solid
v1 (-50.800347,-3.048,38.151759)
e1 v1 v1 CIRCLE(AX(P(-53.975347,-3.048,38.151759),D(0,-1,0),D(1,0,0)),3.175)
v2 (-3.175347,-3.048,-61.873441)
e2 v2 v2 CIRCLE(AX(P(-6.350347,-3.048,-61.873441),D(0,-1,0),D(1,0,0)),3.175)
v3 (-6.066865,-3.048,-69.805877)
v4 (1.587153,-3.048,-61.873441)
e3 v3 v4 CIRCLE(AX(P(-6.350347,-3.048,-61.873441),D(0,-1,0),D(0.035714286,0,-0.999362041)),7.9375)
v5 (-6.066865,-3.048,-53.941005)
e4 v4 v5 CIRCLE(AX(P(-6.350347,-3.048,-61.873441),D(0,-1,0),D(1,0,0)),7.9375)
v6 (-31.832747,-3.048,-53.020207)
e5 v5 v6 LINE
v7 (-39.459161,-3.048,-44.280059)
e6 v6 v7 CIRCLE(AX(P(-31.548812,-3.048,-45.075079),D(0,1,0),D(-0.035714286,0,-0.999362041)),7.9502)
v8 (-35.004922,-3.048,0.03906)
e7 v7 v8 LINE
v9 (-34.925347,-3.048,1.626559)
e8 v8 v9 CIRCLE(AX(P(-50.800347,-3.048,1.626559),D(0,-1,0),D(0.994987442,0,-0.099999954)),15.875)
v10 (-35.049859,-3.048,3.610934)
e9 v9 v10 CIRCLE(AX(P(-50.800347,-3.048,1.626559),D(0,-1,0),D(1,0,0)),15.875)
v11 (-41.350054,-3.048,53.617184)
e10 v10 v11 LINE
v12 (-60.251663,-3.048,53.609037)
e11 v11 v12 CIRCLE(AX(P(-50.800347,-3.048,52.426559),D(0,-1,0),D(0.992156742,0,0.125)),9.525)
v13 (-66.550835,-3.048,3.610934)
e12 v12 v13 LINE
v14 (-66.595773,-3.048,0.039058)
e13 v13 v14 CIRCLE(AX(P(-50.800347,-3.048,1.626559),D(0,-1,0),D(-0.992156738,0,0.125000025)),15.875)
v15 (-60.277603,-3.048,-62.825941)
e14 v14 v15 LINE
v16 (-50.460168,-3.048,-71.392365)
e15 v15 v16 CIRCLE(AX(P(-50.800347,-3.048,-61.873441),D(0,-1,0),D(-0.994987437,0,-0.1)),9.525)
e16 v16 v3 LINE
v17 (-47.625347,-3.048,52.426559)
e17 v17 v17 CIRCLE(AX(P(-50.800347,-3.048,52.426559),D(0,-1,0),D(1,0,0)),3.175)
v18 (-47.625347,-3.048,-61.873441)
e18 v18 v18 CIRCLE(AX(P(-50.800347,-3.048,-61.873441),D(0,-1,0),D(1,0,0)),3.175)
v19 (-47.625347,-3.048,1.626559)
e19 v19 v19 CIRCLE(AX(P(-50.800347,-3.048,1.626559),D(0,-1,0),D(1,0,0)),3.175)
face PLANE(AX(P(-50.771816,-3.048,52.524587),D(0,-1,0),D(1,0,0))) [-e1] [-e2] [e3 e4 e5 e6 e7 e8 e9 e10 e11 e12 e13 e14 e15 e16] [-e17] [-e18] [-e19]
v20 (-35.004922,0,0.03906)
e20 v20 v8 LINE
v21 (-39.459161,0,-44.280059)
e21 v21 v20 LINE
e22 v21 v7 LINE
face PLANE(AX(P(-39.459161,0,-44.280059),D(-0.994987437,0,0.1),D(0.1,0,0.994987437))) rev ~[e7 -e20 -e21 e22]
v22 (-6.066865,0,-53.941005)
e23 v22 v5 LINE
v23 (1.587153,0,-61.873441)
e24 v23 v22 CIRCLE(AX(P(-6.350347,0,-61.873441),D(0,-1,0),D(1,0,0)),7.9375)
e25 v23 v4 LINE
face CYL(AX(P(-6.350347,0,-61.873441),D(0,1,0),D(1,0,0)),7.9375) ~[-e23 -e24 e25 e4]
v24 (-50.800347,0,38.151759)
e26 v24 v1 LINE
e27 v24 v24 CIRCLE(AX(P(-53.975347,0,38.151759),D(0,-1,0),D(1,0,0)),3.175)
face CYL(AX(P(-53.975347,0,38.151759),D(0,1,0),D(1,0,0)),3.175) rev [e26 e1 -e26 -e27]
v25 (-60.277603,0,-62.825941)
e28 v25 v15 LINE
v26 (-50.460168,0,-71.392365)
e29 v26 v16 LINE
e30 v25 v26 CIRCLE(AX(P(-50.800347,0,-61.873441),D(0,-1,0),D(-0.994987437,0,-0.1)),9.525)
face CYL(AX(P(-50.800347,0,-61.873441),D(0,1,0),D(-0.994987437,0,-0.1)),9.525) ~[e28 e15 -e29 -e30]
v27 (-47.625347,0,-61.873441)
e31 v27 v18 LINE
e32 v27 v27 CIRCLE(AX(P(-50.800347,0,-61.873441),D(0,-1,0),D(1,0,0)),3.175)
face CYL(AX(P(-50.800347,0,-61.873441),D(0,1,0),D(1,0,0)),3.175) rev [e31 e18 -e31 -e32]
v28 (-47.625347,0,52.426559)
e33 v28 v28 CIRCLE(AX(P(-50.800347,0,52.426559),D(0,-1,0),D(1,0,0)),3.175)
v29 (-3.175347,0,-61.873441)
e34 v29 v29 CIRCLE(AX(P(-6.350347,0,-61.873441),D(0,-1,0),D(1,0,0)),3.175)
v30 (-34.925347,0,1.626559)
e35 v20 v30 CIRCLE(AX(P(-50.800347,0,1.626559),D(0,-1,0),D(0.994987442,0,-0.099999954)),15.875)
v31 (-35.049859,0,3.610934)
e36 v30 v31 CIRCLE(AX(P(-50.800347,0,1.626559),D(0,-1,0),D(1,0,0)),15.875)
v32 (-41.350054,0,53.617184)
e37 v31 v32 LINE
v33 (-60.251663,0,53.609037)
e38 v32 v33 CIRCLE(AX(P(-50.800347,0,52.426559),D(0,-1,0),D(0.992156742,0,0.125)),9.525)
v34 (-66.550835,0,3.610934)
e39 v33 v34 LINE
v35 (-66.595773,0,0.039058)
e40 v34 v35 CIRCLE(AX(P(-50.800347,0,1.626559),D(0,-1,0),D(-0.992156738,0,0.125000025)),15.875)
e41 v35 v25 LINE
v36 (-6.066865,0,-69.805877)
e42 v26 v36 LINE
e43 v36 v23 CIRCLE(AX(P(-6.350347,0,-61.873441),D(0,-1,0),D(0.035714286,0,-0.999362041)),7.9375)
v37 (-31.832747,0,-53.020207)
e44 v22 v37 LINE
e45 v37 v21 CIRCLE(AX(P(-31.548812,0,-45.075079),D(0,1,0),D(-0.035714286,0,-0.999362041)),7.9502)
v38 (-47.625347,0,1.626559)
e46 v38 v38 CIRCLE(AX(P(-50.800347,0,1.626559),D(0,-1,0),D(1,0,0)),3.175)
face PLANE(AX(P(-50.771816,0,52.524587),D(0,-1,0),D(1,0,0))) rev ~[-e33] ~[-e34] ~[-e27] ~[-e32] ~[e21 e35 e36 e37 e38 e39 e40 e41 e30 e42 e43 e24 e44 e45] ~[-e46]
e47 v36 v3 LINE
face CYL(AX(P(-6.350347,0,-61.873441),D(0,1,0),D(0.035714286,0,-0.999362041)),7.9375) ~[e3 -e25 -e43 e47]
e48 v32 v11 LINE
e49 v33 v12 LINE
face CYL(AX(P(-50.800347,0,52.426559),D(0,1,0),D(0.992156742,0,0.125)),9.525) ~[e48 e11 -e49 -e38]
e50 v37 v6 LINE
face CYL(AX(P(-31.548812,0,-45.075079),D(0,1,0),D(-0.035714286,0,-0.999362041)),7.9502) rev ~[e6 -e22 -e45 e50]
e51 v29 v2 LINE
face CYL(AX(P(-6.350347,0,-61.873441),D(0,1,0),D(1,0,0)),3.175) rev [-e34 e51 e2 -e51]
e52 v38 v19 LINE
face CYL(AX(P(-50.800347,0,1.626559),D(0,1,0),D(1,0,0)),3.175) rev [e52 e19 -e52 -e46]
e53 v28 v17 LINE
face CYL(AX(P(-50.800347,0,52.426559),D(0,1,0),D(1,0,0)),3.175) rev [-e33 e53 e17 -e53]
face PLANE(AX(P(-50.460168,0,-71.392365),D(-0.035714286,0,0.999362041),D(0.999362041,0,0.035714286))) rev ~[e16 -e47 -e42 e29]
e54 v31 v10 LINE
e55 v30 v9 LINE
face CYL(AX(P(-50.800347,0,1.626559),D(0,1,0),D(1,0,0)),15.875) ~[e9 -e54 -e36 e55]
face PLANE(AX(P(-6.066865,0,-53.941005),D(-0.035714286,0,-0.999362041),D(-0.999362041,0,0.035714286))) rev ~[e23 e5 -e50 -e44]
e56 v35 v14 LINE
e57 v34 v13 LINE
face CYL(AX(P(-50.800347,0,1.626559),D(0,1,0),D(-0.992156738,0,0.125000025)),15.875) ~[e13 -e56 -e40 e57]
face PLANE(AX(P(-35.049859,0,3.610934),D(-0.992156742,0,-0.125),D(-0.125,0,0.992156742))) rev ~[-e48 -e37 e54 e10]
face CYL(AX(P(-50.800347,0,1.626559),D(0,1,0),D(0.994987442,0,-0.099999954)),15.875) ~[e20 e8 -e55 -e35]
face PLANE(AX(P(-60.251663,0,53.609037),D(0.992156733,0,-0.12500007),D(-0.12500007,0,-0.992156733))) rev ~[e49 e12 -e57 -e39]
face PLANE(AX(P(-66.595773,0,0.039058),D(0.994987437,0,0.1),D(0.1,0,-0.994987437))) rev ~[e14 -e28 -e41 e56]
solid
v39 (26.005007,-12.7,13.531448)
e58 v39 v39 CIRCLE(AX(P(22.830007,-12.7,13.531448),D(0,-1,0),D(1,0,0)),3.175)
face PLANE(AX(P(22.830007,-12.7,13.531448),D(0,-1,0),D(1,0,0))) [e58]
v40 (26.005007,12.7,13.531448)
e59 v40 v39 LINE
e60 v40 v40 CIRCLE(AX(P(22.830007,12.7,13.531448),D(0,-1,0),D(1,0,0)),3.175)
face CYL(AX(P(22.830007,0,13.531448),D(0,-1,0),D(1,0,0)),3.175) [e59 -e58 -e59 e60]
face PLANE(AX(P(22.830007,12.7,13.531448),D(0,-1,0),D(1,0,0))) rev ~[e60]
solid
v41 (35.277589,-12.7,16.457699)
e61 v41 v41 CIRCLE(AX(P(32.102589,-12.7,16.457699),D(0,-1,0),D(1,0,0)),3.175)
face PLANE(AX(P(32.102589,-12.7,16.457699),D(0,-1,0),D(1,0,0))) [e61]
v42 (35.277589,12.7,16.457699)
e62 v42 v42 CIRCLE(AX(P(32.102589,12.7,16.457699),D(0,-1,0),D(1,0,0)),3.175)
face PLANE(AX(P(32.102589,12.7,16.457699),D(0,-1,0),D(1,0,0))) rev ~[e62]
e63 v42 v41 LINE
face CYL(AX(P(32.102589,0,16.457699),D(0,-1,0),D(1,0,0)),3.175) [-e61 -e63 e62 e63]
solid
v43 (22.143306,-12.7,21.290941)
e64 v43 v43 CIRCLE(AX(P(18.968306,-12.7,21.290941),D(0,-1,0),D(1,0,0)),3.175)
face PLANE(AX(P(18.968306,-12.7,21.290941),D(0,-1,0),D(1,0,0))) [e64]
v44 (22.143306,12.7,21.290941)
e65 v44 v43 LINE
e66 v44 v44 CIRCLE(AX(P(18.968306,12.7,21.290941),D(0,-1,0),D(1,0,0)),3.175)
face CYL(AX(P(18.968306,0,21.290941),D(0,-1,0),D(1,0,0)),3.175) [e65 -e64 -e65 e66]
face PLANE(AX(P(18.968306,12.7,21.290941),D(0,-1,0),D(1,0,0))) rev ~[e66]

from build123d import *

# Parameters (mm, degrees)
F0_R     = 3.175
F1_DEPTH = 3.048
F2_R     = 3.175
F3_DEPTH = 12.7
F5_R     = 3.175
F6_DEPTH = 12.7
F4_R     = 3.175
F7_DEPTH = 12.7


# Not quite as in the source:
# - ends of sketch curves that miss each other by under 0.0002 mm in the source are joined


with BuildPart() as f1:
    # F0 (on Front) → F1 (new body)
    with BuildSketch(Plane.XZ):
        with BuildLine():
            ThreePointArc((-60.2516630306, 53.6090369056), (-51.3927330128, 42.919997736), (-41.2753472159, 52.4265588422))
            ThreePointArc((-41.2753472159, 52.4265588422), (-41.2940423216, 53.0230420842), (-41.3500542517, 53.6171838422))
            ThreePointArc((-41.3500542517, 53.6171838422), (-50.8044526635, 61.9515579575), (-60.2516630306, 53.6090369056))
        make_face()
        with Locations((-50.8003472159, 52.4265588422)):
            Circle(F0_R, mode=Mode.SUBTRACT)
        with BuildLine():
            ThreePointArc((-41.3500542517, 53.6171838422), (-41.2940423216, 53.0230420842), (-41.2753472159, 52.4265588422))
            ThreePointArc((-41.2753472159, 52.4265588422), (-51.3927330128, 42.919997736), (-60.2516630306, 53.6090369056))
            Line((-60.2516630306, 53.6090369056), (-66.5508354393, 3.6109342409))
            ThreePointArc((-66.5508354393, 3.6109342409), (-50.800347015, 17.5015588422), (-35.0498589422, 3.6109338422))
            Line((-35.0498589422, 3.6109338422), (-41.3500542517, 53.6171838422))
        make_face()
        with Locations((-53.9753472159, 38.1517588422)):
            Circle(F0_R, mode=Mode.SUBTRACT)
        with BuildLine():
            ThreePointArc((-34.9253472159, 1.6265588422), (-34.9565057255, 2.6206975789), (-35.0498589422, 3.6109338422))
            ThreePointArc((-35.0498589422, 3.6109338422), (-50.800347015, 17.5015588422), (-66.5508354393, 3.6109342409))
            ThreePointArc((-66.5508354393, 3.6109342409), (-66.6740910318, 1.8262642914), (-66.5957727323, 0.0390583677))
            ThreePointArc((-66.5957727323, 0.0390583677), (-50.8003466117, -14.2484411578), (-35.0049215787, 0.03905957))
            ThreePointArc((-35.0049215787, 0.03905957), (-34.9452532869, 0.8318126534), (-34.9253472159, 1.6265588422))
        make_face()
        with Locations((-50.8003472159, 1.6265588422)):
            Circle(F0_R, mode=Mode.SUBTRACT)
        with BuildLine():
            ThreePointArc((-35.0049215787, 0.03905957), (-50.8003466117, -14.2484411578), (-66.5957727323, 0.0390583677))
            Line((-66.5957727323, 0.0390583677), (-60.2776025543, -62.8259411578))
            ThreePointArc((-60.2776025543, -62.8259411578), (-51.2771951483, -52.3603848114), (-41.2753472159, -61.8734411578))
            ThreePointArc((-41.2753472159, -61.8734411578), (-43.9459387338, -68.4872682919), (-50.460168079, -71.3923645819))
            Line((-50.460168079, -71.3923645819), (-6.066865073, -69.8058773614))
            ThreePointArc((-6.066865073, -69.8058773614), (-14.2878472159, -61.8734411578), (-6.066865073, -53.9410049541))
            Line((-6.066865073, -53.9410049541), (-31.8327472154, -53.0202074469))
            ThreePointArc((-31.8327472154, -53.0202074469), (-37.5391473185, -50.3020820079), (-39.4591606236, -44.2800593454))
            Line((-39.4591606236, -44.2800593454), (-35.0049215787, 0.03905957))
        make_face()
        with BuildLine():
            ThreePointArc((-41.2753472159, -61.8734411578), (-51.2771951483, -52.3603848114), (-60.2776025543, -62.8259411578))
            ThreePointArc((-60.2776025543, -62.8259411578), (-57.0627303844, -69.0503612528), (-50.460168079, -71.3923645819))
            ThreePointArc((-50.460168079, -71.3923645819), (-43.9459387338, -68.4872682919), (-41.2753472159, -61.8734411578))
        make_face()
        with Locations((-50.8003472159, -61.8734411578)):
            Circle(F0_R, mode=Mode.SUBTRACT)
        with BuildLine():
            ThreePointArc((-6.066865073, -53.9410049541), (-14.2878472159, -61.8734411578), (-6.066865073, -69.8058773614))
            ThreePointArc((-6.066865073, -69.8058773614), (-0.6383403112, -67.3849639392), (1.5871527841, -61.8734411578))
            ThreePointArc((1.5871527841, -61.8734411578), (-0.6383403112, -56.3619183763), (-6.066865073, -53.9410049541))
        make_face()
        with Locations((-6.3503472159, -61.8734411578)):
            Circle(F0_R, mode=Mode.SUBTRACT)
    extrude(amount=F1_DEPTH)


with BuildPart() as f3:
    # F2 (on Front) → F3 (new body, symmetric)
    with BuildSketch(Plane.XZ):
        with Locations((18.9683057667, 21.2909408399)):
            Circle(F2_R)
    extrude(amount=F3_DEPTH, both=True)


with BuildPart() as f6:
    # F5 (on Front) → F6 (new body, symmetric)
    with BuildSketch(Plane.XZ):
        with Locations((32.1025885642, 16.4576992393)):
            Circle(F5_R)
    extrude(amount=F6_DEPTH, both=True)


with BuildPart() as f7:
    # F4 (on Front) → F7 (new body, symmetric)
    with BuildSketch(Plane.XZ):
        with Locations((22.8300068826, 13.5314479956)):
            Circle(F4_R)
    extrude(amount=F7_DEPTH, both=True)


solid = Compound([f1.part, f3.part, f6.part, f7.part])
